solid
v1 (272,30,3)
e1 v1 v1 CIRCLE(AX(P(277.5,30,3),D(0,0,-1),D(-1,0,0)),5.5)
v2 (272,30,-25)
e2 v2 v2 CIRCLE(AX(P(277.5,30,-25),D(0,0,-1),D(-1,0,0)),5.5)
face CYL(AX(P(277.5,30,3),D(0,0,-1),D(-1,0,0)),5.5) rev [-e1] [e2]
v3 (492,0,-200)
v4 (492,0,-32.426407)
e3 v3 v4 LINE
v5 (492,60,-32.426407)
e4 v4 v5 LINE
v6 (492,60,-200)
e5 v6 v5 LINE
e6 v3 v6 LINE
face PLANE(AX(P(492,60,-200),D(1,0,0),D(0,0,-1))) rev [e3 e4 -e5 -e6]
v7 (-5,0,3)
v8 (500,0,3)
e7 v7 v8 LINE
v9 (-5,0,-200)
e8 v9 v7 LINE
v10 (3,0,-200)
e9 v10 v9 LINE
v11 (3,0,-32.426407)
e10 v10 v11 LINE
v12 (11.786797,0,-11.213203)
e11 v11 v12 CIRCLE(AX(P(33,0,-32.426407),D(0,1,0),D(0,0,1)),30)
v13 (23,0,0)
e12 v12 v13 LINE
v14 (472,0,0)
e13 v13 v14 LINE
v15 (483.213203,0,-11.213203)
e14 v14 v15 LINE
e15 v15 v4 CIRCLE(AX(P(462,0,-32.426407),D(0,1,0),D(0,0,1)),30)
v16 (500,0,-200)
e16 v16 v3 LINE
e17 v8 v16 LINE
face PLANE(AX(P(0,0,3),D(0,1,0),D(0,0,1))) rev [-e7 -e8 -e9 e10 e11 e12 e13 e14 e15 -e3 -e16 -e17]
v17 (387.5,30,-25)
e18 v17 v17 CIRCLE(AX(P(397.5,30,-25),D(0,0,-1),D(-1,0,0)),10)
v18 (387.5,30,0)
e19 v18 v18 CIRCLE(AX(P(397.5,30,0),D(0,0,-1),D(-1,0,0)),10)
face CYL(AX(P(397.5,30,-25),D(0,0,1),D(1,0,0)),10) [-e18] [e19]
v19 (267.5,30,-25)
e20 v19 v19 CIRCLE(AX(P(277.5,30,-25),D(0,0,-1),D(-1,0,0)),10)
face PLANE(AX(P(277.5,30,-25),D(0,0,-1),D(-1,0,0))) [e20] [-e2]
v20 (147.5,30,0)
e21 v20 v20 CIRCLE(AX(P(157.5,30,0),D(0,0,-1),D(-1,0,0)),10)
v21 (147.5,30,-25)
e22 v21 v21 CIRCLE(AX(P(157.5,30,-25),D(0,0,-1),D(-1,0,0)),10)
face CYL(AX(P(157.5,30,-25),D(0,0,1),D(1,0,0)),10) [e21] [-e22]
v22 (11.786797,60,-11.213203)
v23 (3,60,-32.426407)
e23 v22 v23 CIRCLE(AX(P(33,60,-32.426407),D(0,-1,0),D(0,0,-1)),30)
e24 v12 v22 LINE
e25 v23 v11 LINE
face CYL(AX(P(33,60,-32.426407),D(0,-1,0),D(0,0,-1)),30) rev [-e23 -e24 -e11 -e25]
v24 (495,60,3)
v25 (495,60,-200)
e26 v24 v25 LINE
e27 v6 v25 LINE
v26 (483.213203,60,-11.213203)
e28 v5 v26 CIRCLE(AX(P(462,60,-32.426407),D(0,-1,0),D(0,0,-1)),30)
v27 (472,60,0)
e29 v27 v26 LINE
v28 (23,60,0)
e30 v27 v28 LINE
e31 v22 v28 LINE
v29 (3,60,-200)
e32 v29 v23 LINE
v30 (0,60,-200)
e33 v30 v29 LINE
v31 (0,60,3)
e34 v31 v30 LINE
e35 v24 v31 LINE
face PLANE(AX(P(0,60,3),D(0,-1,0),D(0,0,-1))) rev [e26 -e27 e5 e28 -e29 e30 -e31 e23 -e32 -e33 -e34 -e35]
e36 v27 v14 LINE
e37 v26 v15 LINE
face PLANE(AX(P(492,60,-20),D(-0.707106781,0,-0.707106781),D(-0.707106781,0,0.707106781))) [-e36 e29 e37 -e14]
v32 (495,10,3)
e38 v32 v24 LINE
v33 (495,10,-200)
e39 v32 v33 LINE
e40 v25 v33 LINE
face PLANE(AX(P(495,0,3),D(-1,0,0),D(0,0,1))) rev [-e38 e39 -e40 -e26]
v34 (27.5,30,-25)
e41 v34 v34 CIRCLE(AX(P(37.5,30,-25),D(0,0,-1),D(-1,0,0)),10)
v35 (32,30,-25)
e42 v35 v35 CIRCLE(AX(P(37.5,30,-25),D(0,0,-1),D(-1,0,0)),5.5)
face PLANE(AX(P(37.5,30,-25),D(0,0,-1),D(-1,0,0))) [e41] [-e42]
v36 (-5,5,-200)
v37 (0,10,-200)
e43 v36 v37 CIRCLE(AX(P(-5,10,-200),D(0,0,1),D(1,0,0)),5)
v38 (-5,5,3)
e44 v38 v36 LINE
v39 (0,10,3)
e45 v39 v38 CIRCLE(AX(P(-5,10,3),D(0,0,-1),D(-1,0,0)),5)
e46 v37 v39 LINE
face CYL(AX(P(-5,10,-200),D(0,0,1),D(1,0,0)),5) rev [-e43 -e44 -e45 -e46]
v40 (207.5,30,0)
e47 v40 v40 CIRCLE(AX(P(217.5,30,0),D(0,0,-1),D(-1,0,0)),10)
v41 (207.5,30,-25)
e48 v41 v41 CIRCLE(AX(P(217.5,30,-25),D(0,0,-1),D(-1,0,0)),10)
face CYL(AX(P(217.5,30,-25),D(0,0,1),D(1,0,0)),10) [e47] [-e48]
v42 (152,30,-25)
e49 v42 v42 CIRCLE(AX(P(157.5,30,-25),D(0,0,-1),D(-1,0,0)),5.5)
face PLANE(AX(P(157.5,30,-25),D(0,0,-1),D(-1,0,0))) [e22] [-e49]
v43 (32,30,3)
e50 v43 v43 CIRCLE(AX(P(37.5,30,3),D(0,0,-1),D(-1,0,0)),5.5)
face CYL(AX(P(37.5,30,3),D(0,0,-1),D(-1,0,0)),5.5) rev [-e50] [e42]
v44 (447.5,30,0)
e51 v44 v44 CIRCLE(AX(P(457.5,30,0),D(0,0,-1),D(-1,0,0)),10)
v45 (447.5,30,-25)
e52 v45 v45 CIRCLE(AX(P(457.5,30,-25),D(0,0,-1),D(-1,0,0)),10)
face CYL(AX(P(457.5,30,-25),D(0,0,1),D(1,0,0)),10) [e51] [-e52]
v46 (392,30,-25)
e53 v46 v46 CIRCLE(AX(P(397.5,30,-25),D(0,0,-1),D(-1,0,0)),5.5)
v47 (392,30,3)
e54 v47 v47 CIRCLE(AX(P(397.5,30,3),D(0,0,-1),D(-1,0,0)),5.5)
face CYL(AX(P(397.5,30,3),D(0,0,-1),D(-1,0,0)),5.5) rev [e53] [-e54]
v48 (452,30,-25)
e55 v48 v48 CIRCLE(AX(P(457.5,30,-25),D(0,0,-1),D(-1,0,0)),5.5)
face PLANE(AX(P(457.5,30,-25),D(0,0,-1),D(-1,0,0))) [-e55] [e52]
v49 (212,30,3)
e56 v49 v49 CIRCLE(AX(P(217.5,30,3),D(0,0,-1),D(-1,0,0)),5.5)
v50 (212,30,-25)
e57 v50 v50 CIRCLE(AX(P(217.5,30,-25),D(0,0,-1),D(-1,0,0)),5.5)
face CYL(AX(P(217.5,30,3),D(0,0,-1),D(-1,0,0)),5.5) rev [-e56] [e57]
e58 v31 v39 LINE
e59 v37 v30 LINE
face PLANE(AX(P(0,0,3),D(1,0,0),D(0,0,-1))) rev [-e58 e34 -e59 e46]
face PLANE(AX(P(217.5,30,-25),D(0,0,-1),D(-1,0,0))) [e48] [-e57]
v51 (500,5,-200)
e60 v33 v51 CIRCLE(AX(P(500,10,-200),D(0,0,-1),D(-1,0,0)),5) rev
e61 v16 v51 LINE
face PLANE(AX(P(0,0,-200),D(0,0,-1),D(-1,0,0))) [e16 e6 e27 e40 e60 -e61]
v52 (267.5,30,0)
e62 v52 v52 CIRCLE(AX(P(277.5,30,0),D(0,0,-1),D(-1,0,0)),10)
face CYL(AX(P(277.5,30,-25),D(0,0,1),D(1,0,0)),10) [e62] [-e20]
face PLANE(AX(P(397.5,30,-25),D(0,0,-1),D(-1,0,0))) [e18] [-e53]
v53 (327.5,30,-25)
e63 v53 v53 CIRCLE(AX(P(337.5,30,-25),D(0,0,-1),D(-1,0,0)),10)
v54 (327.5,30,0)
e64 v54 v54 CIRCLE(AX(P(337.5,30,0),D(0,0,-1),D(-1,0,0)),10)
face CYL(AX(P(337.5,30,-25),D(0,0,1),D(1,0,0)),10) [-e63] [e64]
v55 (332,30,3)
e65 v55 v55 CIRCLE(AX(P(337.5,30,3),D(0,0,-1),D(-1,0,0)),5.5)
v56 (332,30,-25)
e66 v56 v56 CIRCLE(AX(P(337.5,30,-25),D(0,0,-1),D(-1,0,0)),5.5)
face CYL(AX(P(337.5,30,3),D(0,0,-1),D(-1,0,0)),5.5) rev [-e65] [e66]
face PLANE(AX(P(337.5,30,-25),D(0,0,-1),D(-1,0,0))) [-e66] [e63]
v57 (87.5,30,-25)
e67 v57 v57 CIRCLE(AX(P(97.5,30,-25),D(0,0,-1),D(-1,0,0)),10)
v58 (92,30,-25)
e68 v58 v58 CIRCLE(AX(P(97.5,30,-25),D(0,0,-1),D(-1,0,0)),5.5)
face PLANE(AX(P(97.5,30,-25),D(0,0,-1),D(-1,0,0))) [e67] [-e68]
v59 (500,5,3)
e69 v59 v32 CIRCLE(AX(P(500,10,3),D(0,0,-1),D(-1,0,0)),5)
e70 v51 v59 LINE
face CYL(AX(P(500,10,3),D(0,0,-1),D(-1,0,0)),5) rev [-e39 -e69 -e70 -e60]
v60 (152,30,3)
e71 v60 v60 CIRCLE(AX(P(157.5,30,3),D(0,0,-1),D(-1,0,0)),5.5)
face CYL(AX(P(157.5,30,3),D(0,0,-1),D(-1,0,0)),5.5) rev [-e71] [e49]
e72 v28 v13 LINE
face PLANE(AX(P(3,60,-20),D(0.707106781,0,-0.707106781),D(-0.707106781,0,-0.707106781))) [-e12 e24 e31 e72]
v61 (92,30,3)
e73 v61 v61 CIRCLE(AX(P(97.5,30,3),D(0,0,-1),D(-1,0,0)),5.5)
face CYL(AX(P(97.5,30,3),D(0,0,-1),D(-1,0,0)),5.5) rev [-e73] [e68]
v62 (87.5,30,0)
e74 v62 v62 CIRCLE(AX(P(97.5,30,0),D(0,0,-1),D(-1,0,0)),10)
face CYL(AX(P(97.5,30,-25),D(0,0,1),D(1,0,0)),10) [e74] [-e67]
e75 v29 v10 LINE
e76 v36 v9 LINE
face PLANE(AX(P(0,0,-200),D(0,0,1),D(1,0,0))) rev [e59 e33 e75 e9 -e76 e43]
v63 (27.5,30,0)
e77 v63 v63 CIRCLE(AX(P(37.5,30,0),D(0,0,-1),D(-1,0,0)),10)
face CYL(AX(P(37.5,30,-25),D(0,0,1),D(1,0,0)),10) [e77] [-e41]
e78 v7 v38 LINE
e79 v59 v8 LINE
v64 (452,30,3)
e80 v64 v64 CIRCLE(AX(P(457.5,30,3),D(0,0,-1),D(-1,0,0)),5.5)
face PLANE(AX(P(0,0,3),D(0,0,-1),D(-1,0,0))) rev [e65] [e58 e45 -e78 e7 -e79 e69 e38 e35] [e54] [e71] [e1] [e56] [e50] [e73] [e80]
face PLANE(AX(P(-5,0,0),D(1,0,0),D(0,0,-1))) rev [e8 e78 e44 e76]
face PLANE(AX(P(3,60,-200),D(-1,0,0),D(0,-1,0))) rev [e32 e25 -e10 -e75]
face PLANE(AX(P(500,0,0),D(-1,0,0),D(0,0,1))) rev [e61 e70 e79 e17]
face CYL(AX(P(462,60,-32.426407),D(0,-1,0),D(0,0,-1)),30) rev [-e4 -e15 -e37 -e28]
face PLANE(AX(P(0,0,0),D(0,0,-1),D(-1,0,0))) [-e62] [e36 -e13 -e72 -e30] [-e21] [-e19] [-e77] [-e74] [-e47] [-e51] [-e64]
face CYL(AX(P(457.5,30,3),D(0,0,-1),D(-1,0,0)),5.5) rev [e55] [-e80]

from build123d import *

# Parameters (mm, degrees)
SKETCH_1_W             = 495
SKETCH_1_H             = 60
EXTRUDE_1_DEPTH        = 3
SKETCH_2_W             = 3
SKETCH_2_H             = 60
EXTRUDE_2_DEPTH        = 200
EXTRUDE_3_DEPTH        = 60
SKETCH_4_R             = 10
EXTRUDE_4_DEPTH        = 25
SKETCH_5_R             = 5.5
CUT_EXTRUDE_1_DEPTH    = 529.441103625
PATTERN_LINEAR_1_COUNT = 8
PATTERN_LINEAR_1_PITCH = 60
FILLET_1_R             = 30
SKETCH_6_W             = 203
SKETCH_6_H             = 5
EXTRUDE_5_DEPTH        = 5
SKETCH_7_W             = 203
SKETCH_7_H             = 5
EXTRUDE_6_DEPTH        = 5
FILLET_2_R             = 5
FILLET_3_R             = 5


with BuildPart() as part:
    # 草图1 → 凸台-拉伸1 (new body)
    with BuildSketch(Plane.XY):
        with Locations((247.5, 30)):
            Rectangle(SKETCH_1_W, SKETCH_1_H)
    extrude(amount=EXTRUDE_1_DEPTH)

    # 草图2 → 凸台-拉伸2 (add)
    with BuildSketch(Plane(origin=(0, 0, 0), x_dir=(-1, 0, 0), z_dir=(0, 0, -1))):
        with Locations((-493.5, 30)):
            Rectangle(SKETCH_2_W, SKETCH_2_H)
        with Locations((-1.5, 30)):
            Rectangle(SKETCH_2_W, SKETCH_2_H)
    extrude(amount=EXTRUDE_2_DEPTH)

    # 草图3 → 凸台-拉伸3 (add)
    with BuildSketch(Plane.XZ):
        Polygon((3, -20), (23, 0), (3, 0), align=None)
        Polygon((472, 0), (492, 0), (492, -20), align=None)
    extrude(amount=-EXTRUDE_3_DEPTH)

    # 草图4 → 凸台-拉伸4 (add)
    with BuildSketch(Plane(origin=(0, 0, 0), x_dir=(-1, 0, 0), z_dir=(0, 0, -1))):
        with Locations((-457.5, 30)):
            Circle(SKETCH_4_R)
    extrude_4 = extrude(amount=EXTRUDE_4_DEPTH)

    # 草图5 → 切除-拉伸1 (cut, through all)
    with BuildSketch(Plane(origin=(0, 0, -25), x_dir=(-1, 0, 0), z_dir=(0, 0, -1))):
        with Locations((-457.5, 30)):
            Circle(SKETCH_5_R)
    cut_extrude_1 = extrude(amount=-CUT_EXTRUDE_1_DEPTH, mode=Mode.SUBTRACT)

    # 阵列(线性)1: 凸台-拉伸4, 切除-拉伸1 ×8
    with Locations(*[(-i * PATTERN_LINEAR_1_PITCH, 0, 0) for i in range(1, PATTERN_LINEAR_1_COUNT)]):
        add(extrude_4)
        add(cut_extrude_1, mode=Mode.SUBTRACT)

    # 圆角1
    fillet_1_edges = [part.edges().sort_by_distance(p)[0] for p in [
        (3, 30, -20),
        (492, 30, -20),
    ]]
    fillet(fillet_1_edges, radius=FILLET_1_R)

    # 草图6 → 凸台-拉伸5 (add)
    with BuildSketch(Plane.ZY):
        with Locations((-98.5, 2.5)):
            Rectangle(SKETCH_6_W, SKETCH_6_H)
    extrude(amount=EXTRUDE_5_DEPTH)

    # 草图7 → 凸台-拉伸6 (add)
    with BuildSketch(Plane(origin=(495, 0, 0), x_dir=(0, 0, -1), z_dir=(1, 0, 0))):
        with Locations((98.5, 2.5)):
            Rectangle(SKETCH_7_W, SKETCH_7_H)
    extrude(amount=EXTRUDE_6_DEPTH)

    # 圆角2
    fillet_2_edges = [part.edges().sort_by_distance(p)[0] for p in [
        (0, 5, -98.5),
    ]]
    fillet(fillet_2_edges, radius=FILLET_2_R - 0.0001)  # a hair under: the kernel refuses the full size

    # 圆角3
    fillet_3_edges = [part.edges().sort_by_distance(p)[0] for p in [
        (495, 5, -98.5),
    ]]
    fillet(fillet_3_edges, radius=FILLET_3_R - 0.0001)  # a hair under: the kernel refuses the full size


solid = part.part
